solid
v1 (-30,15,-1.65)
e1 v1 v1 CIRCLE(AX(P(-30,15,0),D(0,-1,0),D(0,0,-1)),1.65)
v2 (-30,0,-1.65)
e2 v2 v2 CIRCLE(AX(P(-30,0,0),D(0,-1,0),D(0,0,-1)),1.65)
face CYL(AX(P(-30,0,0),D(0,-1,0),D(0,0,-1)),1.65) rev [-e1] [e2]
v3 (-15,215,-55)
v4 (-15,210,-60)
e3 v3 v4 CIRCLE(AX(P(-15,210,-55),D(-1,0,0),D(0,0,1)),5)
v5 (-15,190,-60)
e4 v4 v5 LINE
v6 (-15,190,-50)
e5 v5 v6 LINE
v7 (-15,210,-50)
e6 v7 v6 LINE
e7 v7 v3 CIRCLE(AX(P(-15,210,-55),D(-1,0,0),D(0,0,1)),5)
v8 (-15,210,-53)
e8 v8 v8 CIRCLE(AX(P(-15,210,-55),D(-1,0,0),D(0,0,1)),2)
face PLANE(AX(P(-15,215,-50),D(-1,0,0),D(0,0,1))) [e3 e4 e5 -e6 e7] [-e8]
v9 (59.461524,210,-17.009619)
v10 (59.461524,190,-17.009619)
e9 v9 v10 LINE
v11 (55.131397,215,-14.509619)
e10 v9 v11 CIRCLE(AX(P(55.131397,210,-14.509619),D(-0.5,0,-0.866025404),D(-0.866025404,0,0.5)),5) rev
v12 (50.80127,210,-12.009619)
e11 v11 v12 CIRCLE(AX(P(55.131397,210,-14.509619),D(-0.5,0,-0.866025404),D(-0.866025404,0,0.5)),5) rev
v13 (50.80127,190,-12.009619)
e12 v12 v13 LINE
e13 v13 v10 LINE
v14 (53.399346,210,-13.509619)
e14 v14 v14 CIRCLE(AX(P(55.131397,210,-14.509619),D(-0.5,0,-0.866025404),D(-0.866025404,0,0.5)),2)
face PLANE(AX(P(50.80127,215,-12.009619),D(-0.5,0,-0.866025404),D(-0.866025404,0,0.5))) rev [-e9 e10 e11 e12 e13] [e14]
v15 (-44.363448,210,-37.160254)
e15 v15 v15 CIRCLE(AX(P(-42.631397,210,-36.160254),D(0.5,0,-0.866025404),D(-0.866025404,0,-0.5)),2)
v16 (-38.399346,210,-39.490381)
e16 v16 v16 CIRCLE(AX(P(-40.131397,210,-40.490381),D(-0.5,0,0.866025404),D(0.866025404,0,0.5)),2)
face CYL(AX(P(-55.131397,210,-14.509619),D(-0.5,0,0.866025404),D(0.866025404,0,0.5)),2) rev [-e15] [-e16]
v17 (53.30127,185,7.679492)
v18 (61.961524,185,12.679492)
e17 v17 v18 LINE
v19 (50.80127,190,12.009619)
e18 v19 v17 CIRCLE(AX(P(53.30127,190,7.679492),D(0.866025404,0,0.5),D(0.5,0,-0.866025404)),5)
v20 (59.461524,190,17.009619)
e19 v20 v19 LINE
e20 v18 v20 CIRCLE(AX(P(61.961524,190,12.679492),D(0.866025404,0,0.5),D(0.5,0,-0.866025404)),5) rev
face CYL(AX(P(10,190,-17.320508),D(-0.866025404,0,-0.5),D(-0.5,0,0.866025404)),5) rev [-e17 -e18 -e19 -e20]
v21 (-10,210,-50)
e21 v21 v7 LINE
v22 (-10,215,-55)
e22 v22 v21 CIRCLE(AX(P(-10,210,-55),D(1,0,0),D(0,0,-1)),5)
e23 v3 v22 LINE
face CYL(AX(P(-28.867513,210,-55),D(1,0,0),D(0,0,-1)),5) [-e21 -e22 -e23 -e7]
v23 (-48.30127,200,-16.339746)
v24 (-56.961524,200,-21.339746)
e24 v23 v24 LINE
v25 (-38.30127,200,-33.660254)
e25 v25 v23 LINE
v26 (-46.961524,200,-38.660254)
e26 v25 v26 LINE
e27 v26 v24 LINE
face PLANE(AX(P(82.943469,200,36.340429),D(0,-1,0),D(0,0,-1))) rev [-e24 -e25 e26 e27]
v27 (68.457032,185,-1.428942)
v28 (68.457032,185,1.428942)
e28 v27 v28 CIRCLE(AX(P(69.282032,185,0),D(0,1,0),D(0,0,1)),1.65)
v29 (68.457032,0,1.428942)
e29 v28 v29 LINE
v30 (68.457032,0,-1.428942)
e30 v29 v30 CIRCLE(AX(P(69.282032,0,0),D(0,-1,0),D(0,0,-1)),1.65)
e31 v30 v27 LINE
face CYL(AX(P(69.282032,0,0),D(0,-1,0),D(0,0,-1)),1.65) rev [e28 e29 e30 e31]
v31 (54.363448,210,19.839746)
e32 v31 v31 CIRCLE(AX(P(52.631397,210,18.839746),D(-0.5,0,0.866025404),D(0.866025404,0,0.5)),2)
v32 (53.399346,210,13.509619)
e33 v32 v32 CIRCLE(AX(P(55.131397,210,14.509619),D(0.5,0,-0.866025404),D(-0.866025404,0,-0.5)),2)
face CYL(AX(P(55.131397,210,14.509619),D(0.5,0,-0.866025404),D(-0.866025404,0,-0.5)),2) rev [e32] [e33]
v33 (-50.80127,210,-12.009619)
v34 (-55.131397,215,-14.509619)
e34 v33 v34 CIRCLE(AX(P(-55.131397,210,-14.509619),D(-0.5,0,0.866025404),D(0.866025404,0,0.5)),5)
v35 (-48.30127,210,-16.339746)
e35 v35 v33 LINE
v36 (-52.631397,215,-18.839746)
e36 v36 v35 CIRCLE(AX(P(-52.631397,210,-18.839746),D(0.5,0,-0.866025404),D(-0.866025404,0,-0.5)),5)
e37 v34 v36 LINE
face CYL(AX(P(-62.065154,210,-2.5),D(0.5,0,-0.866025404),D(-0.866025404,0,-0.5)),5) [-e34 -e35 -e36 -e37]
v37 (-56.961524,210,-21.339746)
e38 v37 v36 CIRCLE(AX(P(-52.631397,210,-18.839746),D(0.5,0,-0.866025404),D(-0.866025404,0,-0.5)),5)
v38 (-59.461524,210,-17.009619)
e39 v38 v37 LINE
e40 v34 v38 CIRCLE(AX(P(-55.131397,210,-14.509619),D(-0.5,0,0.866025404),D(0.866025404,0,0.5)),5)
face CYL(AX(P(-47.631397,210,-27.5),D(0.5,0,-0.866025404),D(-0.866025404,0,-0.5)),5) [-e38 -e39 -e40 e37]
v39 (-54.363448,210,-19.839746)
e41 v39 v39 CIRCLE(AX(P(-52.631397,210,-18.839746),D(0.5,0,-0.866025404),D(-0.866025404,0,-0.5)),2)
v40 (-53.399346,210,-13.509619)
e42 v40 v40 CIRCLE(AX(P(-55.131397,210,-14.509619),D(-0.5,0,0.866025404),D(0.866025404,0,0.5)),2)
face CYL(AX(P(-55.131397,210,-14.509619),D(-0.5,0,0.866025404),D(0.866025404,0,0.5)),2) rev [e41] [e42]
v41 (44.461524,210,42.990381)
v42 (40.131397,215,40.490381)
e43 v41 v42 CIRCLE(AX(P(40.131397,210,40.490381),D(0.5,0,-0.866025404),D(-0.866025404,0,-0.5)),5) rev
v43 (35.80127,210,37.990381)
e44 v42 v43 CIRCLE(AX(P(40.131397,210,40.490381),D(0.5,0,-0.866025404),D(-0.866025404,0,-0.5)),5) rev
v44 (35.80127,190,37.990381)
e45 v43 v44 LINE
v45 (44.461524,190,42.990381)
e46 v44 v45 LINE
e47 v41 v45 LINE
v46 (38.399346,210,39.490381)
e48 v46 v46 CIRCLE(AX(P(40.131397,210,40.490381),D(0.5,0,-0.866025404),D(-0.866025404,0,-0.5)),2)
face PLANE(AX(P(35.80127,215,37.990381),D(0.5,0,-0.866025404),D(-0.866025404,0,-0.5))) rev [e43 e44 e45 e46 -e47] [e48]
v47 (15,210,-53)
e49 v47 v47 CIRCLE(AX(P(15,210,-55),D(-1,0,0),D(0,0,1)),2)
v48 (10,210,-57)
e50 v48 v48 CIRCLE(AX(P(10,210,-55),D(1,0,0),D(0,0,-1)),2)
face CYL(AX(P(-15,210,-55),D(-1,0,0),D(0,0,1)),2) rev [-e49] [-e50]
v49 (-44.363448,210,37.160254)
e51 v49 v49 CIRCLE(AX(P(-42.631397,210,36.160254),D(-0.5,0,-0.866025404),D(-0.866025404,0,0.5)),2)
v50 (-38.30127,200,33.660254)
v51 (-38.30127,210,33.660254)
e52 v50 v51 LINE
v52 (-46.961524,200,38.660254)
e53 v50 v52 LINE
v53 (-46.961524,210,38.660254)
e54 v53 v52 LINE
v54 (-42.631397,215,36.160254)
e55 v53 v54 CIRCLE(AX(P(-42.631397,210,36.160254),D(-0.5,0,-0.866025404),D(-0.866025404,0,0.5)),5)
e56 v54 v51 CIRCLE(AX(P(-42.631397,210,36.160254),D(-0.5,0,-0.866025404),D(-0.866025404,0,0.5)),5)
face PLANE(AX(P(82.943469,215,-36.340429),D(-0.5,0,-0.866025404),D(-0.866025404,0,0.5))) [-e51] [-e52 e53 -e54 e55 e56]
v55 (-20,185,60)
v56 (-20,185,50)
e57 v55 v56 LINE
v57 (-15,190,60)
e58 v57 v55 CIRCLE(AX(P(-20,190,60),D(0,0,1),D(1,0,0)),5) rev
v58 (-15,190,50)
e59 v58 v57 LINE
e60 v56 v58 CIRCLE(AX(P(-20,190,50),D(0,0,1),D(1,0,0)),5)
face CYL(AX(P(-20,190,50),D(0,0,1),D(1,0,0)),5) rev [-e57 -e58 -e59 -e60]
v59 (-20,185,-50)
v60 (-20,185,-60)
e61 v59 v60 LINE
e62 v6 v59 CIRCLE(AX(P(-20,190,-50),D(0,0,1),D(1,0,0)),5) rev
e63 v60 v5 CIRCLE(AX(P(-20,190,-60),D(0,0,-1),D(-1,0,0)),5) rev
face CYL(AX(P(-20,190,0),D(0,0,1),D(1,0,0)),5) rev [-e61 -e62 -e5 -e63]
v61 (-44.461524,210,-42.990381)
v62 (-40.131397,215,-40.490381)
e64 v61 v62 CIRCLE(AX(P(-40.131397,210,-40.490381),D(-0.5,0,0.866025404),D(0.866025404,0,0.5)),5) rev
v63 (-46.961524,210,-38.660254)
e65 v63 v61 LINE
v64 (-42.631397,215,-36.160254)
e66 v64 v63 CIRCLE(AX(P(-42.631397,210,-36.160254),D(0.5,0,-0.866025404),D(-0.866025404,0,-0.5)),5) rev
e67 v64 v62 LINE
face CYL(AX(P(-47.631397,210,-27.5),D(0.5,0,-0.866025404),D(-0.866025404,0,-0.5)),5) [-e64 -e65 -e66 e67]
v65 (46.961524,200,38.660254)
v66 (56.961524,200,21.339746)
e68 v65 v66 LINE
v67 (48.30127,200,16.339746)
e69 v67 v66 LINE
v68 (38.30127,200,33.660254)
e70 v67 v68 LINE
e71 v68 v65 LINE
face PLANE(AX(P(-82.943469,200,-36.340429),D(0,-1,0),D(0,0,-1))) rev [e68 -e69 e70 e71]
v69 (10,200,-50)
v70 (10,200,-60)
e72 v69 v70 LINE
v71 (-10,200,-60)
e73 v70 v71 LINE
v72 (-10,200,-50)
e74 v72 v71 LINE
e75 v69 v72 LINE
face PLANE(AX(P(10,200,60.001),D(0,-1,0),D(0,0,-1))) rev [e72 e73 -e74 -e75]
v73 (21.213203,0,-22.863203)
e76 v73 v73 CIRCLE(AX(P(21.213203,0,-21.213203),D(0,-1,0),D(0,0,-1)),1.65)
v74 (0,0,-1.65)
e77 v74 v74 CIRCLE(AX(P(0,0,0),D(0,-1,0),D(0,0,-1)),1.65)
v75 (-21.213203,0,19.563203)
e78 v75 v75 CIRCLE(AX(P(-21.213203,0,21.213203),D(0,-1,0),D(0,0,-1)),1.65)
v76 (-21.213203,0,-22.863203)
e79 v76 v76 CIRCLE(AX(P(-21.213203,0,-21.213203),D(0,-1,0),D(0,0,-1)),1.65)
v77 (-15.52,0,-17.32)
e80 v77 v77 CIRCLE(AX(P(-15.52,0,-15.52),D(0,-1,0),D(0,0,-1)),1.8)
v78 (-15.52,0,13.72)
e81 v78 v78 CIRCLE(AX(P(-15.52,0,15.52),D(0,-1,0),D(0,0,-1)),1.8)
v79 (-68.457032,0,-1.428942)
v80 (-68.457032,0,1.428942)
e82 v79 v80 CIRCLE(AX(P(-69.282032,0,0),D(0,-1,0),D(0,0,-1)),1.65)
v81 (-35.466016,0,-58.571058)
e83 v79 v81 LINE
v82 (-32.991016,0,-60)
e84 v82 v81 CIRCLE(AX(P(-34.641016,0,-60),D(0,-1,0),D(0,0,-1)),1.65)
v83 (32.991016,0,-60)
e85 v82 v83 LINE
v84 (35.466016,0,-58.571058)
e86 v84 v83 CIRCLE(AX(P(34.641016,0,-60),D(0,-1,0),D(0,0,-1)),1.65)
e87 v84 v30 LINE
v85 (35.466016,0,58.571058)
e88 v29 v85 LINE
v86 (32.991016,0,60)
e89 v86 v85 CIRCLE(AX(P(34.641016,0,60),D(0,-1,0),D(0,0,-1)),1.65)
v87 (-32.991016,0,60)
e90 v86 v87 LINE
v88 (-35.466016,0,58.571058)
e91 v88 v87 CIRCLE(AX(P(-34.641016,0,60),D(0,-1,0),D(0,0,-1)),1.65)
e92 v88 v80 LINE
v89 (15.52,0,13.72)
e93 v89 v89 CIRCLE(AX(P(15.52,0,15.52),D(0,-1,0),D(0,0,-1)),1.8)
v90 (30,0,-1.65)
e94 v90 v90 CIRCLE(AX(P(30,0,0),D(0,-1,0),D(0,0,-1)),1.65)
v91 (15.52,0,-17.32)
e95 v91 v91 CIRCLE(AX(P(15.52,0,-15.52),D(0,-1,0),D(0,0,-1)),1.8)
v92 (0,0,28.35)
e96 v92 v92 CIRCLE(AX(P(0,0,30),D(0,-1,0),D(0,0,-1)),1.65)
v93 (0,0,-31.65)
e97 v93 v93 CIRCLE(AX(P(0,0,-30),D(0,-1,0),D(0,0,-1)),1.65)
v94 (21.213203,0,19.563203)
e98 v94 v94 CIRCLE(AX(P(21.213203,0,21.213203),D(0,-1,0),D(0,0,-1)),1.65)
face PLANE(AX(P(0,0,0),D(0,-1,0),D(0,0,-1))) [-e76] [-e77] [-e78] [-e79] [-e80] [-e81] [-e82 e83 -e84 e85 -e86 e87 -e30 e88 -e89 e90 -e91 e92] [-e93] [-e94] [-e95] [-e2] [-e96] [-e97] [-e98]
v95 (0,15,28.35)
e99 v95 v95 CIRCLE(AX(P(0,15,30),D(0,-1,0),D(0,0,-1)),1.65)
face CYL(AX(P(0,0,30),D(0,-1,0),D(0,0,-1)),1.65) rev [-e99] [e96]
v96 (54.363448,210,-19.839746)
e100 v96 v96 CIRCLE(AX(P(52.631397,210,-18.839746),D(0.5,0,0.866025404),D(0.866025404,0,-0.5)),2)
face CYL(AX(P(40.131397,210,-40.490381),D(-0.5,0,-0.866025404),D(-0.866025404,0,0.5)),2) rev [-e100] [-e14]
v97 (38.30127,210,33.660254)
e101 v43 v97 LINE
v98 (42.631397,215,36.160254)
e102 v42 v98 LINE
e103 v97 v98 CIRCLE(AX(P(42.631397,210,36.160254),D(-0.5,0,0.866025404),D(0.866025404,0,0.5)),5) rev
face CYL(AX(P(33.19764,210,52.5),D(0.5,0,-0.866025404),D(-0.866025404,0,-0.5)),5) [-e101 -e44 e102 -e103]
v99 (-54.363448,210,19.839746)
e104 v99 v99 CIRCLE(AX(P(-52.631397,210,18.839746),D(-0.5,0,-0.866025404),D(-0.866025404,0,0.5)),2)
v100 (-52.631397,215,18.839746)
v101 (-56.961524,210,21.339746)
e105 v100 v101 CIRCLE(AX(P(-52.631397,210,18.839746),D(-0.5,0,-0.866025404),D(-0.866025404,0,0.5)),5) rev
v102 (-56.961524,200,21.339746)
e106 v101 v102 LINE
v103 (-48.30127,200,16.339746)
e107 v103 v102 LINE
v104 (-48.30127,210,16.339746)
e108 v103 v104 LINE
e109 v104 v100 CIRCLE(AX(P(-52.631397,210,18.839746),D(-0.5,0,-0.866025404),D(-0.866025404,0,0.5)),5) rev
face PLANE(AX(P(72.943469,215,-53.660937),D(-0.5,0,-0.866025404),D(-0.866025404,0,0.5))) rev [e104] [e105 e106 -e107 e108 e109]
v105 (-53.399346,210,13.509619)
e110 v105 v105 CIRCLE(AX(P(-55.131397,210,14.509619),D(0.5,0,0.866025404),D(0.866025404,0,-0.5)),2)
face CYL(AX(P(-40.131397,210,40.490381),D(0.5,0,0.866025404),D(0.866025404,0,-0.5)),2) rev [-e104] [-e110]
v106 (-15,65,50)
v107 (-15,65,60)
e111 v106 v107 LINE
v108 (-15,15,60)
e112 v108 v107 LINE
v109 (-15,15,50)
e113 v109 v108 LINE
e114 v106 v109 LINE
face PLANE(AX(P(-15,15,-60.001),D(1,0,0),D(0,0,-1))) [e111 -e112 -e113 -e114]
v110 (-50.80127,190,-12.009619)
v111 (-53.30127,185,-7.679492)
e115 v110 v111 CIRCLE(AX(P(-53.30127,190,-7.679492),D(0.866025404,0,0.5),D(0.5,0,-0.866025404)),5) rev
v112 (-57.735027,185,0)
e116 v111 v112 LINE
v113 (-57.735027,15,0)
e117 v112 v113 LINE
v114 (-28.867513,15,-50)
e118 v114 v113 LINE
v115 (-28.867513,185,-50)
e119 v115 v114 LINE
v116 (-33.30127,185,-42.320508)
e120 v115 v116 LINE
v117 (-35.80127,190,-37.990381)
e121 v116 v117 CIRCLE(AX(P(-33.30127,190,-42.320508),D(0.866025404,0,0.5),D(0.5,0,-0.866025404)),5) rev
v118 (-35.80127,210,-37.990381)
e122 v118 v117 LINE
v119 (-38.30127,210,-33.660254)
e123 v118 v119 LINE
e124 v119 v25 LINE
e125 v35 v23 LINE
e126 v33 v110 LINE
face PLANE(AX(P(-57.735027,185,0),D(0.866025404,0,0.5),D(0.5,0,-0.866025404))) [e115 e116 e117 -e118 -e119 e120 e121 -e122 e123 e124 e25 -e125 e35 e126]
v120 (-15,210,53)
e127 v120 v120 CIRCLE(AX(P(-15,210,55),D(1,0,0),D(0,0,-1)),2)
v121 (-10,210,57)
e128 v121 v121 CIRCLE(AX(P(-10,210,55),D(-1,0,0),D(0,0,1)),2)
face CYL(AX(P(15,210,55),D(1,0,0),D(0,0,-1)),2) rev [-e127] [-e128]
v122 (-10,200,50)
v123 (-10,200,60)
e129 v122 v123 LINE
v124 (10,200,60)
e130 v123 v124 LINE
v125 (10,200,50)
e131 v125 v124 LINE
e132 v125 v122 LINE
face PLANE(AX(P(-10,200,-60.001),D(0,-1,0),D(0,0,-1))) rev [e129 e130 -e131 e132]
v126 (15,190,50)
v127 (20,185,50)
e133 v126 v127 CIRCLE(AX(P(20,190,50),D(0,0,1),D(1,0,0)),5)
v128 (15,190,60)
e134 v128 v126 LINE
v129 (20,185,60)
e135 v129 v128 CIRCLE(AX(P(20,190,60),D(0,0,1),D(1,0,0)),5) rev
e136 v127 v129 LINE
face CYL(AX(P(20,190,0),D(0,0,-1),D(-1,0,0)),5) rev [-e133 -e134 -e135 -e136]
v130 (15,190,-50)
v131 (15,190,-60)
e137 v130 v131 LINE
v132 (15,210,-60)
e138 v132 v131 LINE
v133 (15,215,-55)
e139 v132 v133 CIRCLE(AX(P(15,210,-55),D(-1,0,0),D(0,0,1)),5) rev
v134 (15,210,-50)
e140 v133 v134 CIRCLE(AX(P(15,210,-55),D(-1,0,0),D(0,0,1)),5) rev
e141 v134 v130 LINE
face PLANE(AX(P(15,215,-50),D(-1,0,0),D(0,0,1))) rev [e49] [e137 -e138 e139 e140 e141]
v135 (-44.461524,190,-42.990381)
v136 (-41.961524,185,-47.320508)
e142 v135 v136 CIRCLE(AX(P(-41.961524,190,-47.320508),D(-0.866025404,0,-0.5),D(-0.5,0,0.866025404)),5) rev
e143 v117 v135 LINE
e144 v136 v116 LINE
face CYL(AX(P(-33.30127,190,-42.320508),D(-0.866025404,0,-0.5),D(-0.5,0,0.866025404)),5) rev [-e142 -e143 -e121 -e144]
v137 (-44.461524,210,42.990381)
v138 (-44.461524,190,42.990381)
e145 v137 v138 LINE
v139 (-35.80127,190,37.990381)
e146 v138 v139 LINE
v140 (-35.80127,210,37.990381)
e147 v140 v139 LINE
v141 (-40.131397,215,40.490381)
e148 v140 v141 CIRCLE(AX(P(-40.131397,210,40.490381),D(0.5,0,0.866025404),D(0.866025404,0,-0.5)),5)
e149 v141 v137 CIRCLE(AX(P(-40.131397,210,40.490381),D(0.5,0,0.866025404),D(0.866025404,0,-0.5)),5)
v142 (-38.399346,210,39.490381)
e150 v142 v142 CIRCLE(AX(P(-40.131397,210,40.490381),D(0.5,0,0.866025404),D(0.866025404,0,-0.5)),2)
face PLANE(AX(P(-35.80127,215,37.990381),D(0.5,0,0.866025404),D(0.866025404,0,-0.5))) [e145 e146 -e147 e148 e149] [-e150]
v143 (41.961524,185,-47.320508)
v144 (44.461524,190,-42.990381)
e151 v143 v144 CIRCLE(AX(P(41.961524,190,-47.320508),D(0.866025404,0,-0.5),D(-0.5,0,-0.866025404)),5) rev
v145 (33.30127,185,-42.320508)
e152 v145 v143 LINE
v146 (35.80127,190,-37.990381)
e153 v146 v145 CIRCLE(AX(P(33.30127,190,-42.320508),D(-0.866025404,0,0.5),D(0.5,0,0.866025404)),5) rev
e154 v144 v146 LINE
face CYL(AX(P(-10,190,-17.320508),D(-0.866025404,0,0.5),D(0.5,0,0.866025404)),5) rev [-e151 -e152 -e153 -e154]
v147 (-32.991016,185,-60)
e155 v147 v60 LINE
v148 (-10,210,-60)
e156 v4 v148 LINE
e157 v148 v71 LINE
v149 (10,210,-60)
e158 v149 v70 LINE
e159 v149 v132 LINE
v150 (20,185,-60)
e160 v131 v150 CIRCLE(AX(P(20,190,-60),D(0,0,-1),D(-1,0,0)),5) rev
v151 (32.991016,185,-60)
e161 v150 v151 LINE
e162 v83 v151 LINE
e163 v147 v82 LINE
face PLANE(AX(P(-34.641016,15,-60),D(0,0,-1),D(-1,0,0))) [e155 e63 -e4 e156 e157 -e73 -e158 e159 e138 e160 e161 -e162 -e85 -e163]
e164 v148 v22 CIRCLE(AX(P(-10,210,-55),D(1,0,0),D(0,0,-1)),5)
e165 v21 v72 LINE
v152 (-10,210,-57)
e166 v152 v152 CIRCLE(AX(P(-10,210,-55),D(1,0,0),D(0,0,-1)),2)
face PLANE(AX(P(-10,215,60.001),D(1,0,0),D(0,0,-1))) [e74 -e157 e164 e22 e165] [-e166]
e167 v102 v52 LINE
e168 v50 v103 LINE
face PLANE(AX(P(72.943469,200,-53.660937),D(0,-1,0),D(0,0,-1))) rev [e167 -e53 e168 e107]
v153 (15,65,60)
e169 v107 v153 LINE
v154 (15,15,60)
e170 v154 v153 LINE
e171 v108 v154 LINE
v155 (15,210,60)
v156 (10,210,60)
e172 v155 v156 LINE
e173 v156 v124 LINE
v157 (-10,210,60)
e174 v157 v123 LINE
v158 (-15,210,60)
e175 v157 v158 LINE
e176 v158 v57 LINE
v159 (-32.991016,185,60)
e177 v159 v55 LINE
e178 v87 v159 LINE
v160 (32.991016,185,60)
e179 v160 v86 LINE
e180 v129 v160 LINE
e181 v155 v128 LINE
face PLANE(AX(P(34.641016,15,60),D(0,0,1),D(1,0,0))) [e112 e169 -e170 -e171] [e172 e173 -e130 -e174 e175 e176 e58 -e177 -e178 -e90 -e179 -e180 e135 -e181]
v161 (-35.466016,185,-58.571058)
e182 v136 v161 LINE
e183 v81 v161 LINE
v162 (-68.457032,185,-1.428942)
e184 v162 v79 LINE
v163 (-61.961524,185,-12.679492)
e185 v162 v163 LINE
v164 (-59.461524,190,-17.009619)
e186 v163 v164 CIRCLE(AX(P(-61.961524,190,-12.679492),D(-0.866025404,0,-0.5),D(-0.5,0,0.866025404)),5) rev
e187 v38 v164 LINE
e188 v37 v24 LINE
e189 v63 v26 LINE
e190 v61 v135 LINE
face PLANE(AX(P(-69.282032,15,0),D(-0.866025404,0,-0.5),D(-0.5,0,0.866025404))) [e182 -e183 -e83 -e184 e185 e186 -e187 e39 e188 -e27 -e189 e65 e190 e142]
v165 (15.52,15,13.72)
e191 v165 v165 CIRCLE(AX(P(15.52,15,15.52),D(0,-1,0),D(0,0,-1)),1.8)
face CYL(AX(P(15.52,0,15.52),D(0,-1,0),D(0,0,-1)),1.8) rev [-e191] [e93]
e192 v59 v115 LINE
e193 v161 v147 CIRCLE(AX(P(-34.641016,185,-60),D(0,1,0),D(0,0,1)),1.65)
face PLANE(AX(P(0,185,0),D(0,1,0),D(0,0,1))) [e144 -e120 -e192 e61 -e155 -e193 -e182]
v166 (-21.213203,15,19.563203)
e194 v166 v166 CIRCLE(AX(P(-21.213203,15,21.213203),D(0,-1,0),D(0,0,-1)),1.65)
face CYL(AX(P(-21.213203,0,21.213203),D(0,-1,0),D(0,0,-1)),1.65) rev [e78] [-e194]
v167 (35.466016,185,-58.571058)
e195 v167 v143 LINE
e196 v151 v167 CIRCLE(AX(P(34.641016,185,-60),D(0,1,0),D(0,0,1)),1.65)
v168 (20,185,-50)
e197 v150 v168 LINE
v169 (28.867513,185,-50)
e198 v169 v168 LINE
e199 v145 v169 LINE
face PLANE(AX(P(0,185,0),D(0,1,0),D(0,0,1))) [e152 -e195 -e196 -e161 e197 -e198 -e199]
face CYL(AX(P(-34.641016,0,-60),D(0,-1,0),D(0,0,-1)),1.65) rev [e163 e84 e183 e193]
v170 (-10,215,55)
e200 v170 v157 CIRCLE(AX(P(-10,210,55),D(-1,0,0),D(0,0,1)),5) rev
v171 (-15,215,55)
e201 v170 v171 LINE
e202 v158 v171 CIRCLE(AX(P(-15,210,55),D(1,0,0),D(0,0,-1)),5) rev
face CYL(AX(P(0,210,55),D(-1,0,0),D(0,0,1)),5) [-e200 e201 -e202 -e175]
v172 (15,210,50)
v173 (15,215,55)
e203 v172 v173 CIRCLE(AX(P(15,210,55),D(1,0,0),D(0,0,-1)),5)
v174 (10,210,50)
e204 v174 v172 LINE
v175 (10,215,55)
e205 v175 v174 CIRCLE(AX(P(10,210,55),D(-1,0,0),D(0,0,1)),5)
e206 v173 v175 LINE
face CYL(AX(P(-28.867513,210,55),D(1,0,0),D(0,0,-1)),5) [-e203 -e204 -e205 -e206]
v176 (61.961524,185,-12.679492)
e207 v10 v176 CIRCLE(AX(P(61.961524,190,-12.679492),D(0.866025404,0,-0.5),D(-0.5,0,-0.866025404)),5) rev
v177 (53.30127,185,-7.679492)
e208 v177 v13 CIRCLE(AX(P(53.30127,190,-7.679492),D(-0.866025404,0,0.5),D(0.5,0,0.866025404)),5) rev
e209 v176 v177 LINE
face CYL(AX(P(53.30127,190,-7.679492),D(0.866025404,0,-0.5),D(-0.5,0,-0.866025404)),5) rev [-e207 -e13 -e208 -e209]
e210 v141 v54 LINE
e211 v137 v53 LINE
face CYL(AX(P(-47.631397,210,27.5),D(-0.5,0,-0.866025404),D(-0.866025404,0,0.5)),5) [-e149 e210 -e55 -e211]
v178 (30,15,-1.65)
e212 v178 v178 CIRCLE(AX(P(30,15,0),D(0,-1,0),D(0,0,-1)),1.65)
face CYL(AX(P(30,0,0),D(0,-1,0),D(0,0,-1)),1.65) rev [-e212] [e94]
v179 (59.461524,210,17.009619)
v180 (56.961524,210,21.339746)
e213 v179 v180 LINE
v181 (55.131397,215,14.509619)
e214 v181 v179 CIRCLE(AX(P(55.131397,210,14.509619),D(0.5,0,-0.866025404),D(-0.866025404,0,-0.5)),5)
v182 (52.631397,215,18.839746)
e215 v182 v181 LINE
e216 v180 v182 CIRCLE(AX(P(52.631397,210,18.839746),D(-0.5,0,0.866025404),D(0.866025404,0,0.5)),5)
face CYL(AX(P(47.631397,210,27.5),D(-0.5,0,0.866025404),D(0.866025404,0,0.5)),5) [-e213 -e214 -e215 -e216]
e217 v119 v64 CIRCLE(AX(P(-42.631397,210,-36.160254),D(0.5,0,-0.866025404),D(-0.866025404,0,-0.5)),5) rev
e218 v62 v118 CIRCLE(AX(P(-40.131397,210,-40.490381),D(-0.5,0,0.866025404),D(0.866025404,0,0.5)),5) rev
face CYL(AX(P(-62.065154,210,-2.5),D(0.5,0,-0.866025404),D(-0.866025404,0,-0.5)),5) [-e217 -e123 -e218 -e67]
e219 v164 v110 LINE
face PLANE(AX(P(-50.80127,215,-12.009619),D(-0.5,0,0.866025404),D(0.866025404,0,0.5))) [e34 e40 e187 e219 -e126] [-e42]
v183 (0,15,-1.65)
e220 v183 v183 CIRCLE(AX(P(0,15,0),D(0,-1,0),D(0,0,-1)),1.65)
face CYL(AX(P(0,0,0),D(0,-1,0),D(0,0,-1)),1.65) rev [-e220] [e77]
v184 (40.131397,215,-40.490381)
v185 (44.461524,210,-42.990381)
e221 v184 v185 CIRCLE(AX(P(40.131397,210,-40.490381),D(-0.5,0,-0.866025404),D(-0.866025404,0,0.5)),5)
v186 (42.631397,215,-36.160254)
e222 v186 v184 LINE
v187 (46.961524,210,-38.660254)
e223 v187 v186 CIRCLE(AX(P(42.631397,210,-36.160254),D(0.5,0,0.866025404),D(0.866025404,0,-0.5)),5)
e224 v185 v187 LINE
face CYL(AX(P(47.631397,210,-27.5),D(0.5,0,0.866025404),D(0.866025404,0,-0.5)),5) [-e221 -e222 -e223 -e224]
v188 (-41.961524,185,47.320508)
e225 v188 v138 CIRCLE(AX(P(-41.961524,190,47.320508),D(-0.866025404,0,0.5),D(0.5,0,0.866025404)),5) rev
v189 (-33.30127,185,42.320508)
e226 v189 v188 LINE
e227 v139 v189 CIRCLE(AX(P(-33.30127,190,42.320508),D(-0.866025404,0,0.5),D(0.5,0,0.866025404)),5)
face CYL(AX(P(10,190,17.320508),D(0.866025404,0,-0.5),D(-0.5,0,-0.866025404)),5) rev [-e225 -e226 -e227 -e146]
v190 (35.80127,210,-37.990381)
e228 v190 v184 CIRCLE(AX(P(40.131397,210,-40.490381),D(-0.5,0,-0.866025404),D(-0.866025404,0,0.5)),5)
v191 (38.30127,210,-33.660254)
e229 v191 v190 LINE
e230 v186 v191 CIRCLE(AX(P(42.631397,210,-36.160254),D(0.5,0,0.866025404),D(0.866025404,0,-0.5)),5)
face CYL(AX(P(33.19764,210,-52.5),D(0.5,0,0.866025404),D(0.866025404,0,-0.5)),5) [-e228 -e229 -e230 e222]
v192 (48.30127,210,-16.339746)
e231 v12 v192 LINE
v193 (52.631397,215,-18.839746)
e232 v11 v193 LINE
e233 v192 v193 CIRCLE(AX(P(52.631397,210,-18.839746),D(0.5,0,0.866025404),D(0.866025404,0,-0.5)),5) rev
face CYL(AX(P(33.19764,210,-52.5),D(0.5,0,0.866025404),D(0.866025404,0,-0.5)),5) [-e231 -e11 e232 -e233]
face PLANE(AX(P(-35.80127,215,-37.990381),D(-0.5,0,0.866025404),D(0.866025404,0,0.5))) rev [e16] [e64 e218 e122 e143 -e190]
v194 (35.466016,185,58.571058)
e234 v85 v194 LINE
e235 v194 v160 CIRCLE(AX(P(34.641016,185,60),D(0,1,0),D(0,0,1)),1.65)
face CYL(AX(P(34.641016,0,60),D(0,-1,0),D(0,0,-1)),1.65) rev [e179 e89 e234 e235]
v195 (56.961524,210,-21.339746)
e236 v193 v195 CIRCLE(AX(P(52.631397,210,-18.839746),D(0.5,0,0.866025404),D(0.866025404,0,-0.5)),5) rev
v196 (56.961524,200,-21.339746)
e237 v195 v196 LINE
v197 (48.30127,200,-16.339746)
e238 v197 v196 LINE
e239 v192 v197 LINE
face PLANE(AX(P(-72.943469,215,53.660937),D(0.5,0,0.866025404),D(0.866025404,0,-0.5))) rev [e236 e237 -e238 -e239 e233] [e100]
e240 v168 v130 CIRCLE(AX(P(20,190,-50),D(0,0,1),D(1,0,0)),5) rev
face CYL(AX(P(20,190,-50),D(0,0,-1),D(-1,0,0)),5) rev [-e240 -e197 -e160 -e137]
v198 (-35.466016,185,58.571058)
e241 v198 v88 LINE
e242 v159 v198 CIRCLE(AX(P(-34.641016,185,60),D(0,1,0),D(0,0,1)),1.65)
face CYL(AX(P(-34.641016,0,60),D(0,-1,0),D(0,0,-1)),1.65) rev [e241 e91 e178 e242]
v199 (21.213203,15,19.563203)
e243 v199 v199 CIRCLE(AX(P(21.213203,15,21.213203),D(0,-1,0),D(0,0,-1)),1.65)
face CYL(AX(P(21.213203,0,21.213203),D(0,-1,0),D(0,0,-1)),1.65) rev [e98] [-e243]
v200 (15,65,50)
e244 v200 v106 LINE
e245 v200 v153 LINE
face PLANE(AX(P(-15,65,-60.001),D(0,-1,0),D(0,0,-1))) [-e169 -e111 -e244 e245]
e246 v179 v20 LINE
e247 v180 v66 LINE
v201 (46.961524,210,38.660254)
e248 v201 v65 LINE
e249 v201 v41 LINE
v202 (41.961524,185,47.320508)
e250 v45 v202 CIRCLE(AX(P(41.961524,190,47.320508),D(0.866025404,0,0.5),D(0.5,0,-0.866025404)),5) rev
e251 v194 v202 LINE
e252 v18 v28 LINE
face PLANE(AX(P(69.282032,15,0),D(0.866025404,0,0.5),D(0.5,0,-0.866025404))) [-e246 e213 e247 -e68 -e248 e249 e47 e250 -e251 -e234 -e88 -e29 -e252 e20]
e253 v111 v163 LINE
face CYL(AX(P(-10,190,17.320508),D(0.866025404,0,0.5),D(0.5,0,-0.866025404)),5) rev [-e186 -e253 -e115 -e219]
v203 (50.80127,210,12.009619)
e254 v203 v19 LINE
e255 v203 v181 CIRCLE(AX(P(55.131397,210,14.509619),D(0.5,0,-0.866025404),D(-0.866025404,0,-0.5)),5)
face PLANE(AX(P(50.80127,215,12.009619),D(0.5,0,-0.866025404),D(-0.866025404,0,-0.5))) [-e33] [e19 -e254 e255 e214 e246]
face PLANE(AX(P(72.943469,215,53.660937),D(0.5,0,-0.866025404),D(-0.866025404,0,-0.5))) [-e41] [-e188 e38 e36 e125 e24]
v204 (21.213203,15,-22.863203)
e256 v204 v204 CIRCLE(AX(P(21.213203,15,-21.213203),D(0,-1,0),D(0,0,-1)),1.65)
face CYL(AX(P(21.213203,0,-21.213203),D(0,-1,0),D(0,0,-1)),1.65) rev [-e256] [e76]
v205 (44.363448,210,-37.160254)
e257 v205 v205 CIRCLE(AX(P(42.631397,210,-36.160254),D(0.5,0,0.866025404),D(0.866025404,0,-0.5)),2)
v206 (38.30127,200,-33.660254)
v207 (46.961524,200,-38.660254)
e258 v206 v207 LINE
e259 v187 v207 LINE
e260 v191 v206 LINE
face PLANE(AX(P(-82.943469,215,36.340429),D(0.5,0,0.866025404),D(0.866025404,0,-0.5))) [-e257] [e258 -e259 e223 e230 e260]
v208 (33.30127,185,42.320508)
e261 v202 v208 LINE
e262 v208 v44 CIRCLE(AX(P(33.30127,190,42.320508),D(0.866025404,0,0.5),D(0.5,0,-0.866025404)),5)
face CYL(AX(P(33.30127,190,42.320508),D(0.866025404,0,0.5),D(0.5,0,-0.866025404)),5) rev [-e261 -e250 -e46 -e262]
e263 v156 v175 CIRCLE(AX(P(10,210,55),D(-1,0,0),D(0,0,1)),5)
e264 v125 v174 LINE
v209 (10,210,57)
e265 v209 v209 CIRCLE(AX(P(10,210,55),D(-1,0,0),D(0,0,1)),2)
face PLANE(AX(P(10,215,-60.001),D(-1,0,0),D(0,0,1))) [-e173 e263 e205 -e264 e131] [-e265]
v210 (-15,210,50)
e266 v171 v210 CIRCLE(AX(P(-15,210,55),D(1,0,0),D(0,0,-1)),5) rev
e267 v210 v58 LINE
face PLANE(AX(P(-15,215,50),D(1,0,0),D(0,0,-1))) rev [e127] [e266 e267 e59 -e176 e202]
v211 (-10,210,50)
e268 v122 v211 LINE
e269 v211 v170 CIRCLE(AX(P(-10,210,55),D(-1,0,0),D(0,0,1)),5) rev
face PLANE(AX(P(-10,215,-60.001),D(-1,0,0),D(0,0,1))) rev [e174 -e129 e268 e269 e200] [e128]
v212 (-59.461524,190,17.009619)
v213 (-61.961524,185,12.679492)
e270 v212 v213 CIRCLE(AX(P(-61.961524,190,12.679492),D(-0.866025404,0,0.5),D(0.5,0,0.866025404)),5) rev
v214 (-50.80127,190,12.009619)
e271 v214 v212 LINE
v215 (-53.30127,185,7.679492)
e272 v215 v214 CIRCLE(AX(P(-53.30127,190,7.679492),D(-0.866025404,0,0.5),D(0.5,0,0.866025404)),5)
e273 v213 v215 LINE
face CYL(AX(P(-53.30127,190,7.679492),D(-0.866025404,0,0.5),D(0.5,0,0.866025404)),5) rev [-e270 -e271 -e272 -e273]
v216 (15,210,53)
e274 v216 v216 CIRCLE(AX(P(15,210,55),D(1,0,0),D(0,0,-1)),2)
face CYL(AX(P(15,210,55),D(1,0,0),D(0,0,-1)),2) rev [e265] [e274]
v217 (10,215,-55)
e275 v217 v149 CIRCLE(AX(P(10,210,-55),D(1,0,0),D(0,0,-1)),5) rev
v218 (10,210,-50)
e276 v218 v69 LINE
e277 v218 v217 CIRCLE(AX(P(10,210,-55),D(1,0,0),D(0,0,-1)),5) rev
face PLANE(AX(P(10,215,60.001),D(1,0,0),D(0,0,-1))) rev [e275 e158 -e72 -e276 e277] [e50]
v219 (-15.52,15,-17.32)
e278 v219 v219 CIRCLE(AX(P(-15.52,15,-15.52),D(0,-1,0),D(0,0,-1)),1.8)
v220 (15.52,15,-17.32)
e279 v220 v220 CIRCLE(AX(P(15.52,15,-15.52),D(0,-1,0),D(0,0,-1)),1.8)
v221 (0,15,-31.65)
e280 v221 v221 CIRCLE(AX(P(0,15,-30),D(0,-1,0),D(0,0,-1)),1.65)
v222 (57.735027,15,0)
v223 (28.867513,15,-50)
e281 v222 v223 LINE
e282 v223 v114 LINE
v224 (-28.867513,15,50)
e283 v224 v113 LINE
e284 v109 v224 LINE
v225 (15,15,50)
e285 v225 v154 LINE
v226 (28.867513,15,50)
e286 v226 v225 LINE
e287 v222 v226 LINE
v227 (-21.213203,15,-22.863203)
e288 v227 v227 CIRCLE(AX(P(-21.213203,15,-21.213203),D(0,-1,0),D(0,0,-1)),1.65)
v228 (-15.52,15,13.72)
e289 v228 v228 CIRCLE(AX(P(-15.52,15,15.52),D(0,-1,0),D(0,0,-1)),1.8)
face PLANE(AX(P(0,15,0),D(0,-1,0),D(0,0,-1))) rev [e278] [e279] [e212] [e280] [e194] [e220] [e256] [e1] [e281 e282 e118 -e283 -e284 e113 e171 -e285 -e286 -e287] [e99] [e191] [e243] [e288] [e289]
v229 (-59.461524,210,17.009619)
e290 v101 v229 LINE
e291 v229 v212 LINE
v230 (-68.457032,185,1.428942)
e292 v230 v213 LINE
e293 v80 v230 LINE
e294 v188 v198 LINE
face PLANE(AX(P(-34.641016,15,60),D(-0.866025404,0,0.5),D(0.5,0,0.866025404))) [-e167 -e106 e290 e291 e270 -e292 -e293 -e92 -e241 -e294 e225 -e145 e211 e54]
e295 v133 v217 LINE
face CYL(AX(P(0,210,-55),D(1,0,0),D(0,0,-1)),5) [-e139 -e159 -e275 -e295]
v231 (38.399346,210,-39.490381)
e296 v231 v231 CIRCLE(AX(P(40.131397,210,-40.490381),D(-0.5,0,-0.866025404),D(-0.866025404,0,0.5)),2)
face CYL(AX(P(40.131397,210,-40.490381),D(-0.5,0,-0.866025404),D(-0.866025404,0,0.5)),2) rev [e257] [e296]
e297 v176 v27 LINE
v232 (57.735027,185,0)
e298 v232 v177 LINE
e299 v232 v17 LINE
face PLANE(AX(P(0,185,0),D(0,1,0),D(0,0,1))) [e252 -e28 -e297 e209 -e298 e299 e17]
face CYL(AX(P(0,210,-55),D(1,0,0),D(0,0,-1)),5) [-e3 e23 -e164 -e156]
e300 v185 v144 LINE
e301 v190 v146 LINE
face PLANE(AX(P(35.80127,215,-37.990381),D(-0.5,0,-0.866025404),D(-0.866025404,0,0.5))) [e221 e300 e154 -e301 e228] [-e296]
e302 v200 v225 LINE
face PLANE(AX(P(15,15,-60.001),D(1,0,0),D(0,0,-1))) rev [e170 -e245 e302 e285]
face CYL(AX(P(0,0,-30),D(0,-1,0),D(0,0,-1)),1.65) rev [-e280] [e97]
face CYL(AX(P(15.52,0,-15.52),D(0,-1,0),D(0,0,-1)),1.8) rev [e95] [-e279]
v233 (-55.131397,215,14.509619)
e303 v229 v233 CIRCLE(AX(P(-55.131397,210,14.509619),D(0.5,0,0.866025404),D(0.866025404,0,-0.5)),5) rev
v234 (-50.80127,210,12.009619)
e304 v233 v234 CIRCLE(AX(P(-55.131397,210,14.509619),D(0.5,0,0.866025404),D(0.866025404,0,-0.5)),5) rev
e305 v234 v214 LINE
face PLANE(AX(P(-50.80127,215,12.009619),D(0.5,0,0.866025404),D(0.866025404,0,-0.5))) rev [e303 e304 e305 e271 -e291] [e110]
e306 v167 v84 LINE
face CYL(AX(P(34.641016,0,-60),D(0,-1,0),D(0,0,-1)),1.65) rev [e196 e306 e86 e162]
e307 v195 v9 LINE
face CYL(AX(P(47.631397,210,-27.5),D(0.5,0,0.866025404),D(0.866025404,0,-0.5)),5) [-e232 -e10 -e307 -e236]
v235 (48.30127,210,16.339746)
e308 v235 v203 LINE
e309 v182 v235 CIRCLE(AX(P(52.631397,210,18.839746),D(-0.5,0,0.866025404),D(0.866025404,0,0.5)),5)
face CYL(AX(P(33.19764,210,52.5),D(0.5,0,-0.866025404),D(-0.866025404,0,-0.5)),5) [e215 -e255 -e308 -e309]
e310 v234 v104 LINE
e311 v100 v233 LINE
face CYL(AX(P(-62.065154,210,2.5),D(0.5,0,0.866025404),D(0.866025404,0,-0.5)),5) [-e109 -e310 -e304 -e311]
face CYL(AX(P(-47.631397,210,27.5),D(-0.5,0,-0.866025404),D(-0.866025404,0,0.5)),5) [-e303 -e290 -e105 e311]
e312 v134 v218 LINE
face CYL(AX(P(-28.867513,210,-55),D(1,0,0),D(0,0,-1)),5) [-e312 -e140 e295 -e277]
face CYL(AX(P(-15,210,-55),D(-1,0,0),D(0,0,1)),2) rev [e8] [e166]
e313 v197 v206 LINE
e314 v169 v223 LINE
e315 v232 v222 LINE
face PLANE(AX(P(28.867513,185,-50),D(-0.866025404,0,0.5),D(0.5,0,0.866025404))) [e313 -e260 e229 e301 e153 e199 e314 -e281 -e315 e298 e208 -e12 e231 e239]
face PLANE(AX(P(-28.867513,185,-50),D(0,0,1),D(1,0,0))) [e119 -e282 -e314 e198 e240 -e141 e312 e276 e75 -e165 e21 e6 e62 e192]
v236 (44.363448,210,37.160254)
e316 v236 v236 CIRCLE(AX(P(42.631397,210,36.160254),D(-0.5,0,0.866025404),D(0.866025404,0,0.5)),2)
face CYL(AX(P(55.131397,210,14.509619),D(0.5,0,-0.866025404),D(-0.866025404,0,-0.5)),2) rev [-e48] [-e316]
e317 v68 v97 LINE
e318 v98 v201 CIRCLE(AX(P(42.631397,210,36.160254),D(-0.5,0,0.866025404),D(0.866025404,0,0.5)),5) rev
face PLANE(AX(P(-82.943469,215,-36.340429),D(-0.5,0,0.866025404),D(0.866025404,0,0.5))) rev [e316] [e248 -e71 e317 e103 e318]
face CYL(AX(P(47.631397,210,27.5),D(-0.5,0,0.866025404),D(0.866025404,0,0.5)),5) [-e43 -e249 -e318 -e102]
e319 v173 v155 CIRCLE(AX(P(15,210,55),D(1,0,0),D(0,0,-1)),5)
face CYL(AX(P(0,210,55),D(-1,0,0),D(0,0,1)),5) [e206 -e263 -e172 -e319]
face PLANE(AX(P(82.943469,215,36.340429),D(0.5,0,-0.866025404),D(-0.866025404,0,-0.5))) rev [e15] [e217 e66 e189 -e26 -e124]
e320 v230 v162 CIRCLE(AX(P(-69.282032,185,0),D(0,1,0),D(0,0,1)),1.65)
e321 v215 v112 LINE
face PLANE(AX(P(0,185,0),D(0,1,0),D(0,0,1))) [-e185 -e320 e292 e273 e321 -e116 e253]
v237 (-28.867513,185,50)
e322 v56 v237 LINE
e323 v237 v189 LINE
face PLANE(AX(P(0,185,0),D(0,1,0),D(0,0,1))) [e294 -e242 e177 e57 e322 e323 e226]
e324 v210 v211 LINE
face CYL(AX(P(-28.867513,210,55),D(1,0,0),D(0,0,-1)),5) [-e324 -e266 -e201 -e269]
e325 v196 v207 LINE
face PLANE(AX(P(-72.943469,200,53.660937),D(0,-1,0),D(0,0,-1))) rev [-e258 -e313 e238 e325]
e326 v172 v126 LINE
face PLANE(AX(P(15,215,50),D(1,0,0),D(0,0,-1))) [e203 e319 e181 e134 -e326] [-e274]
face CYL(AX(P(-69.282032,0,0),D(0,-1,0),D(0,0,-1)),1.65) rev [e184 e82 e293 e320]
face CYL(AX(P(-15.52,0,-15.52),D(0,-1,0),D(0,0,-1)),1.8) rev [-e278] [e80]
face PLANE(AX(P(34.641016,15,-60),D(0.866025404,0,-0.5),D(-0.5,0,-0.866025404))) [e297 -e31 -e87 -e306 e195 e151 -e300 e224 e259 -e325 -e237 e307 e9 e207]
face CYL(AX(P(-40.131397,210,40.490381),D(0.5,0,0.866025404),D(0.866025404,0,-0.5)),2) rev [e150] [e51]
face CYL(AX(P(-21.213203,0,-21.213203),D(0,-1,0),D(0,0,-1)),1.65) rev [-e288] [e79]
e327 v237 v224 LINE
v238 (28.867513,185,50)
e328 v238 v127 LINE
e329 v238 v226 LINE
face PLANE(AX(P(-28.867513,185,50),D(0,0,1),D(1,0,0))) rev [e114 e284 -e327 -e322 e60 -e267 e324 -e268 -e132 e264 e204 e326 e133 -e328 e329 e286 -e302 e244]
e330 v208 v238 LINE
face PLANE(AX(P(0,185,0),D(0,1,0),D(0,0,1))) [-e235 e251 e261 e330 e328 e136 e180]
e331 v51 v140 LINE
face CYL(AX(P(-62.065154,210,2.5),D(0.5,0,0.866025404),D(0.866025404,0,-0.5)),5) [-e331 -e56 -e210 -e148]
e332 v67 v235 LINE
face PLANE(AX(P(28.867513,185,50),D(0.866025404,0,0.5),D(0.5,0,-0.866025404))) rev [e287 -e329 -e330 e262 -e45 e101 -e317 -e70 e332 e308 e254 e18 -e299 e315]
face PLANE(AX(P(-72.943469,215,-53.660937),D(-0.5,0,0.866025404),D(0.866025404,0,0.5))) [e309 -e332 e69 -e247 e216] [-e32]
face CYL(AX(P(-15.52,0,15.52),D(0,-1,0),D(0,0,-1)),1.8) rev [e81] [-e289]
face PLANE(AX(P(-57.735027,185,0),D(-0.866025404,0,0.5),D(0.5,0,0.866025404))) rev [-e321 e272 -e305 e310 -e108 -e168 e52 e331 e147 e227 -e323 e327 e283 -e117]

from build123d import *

# Parameters (mm, degrees)
BOSS_EXTRUDE1_DEPTH                 = 15
BOSS_EXTRUDE3_DEPTH                 = 170
SKETCH5_W                           = 30
SKETCH5_H                           = 10
BOSS_EXTRUDE4_DEPTH                 = 30
CIRPATTERN2_COUNT                   = 6
CUT_EXTRUDE1_REACH                  = 264.726
SKETCH7_W                           = 20
SKETCH7_H                           = 15
CIRPATTERN4_COUNT                   = 6
FILLET1_R                           = 5
F_4_0_MM_DOWEL_HOLES1_D             = 4
CIRPATTERN8_COUNT                   = 6
CUT_EXTRUDE2_REACH                  = 257.783
SKETCH11_W                          = 30
SKETCH11_H                          = 50
M3_CLEARANCE_HOLE1_D                = 3.6
LPATTERN1_COUNT                     = 2
LPATTERN1_PITCH                     = 31.04
LPATTERN1_COUNT_DIR2                = 2
LPATTERN1_PITCH_DIR2                = 31.04
TAP_DRILL_FOR_M4X0_7_TAP2_OUTLINE_R = 1.65
TAP_DRILL_FOR_M4X0_7_TAP2_DEPTH     = 185


# Read off the part's stored shape, not the designer's step: Tap Drill for M4x0.7 Tap2
with BuildPart() as part:
    # Sketch1 → Boss-Extrude1 (new body)
    with BuildSketch(Plane(origin=(0, 0, 0), x_dir=(1, 0, 0), z_dir=(0, 1, 0))):
        Polygon((-69.282032303, 0), (-34.641016151, 60), (34.641016151, 60), (69.282032303, 0), (34.641016151, -60), (-34.641016151, -60), align=None)
    extrude(amount=BOSS_EXTRUDE1_DEPTH)

    # Sketch4 → Boss-Extrude3 (add)
    with BuildSketch(Plane(origin=(0, 15, 0), x_dir=(1, 0, 0), z_dir=(0, 1, 0))):
        Polygon((-34.641016151, -60), (34.641016151, -60), (69.282032303, 0), (57.735026919, 0), (28.867513459, -50), (-28.867513459, -50), (-57.735026919, 0), (-69.282032303, 0), align=None)
    boss_extrude3 = extrude(amount=BOSS_EXTRUDE3_DEPTH)

    # Mirror1: Boss-Extrude3 across plane
    add(boss_extrude3.mirror(Plane(origin=(57.735026919, 185, 0), x_dir=(1, 0, 0), z_dir=(0, 0, 1))))

    # Sketch5 → Boss-Extrude4 (add)
    with BuildSketch(Plane(origin=(0, 185, 0), x_dir=(1, 0, 0), z_dir=(0, 1, 0))):
        with Locations((0, -55)):
            Rectangle(SKETCH5_W, SKETCH5_H)
    boss_extrude4 = extrude(amount=BOSS_EXTRUDE4_DEPTH)

    # CirPattern2: Boss-Extrude4 ×6 about axis
    cirpattern2_axis = Axis((0, 0, 0), (0, 1, 0))
    for i in range(1, CIRPATTERN2_COUNT):
        add(boss_extrude4.rotate(cirpattern2_axis, i * 360 / CIRPATTERN2_COUNT))

    # Sketch7 → Cut-Extrude1 (cut, up to next)
    with BuildSketch(Plane(origin=(-51.961524227, 0, 30), x_dir=(0.49999999999999695, 0, 0.8660254037844404), z_dir=(-0.8660254037844404, 0, 0.49999999999999695)), mode=Mode.PRIVATE) as cut_extrude1_sk1:
        with Locations((0, 207.5)):
            Rectangle(SKETCH7_W, SKETCH7_H)
    cut_extrude1_tool1 = extrude(cut_extrude1_sk1.sketch, amount=-CUT_EXTRUDE1_REACH, mode=Mode.PRIVATE) & part.part
    cut_extrude1 = cut_extrude1_tool1.solids().sort_by_distance((-51.961524, 207.5, 30))[0]
    add(cut_extrude1, mode=Mode.SUBTRACT)

    # CirPattern4: Cut-Extrude1 ×6 about axis
    cirpattern4_axis = Axis((0, 0, 0), (0, 1, 0))
    for i in range(1, CIRPATTERN4_COUNT):
        add(cut_extrude1.rotate(cirpattern4_axis, i * 360 / CIRPATTERN4_COUNT), mode=Mode.SUBTRACT)

    # Fillet1
    fillet1_edges = [part.edges().sort_by_distance(p)[0] for p in [
        (-55.131397208, 185, 14.509618943),
        (-40.131397208, 185, 40.490381057),
        (-40.131397208, 185, -40.490381057),
        (-55.131397208, 185, -14.509618943),
        (15, 185, -55),
        (-15, 185, -55),
        (55.131397208, 185, -14.509618943),
        (40.131397208, 185, -40.490381057),
        (40.131397208, 185, 40.490381057),
        (55.131397208, 185, 14.509618943),
        (-15, 185, 55),
        (15, 185, 55),
    ]]
    fillet(fillet1_edges, radius=FILLET1_R)
    fillet1_2_edges = [part.edges().sort_by_distance(p)[0] for p in [
        (-49.551270189, 215, 14.174682453),
        (-58.211524227, 215, 19.174682453),
        (-37.051270189, 215, -35.825317547),
        (-45.711524227, 215, -40.825317547),
        (12.5, 215, -50),
        (12.5, 215, -60),
        (49.551270189, 215, -14.174682453),
        (58.211524227, 215, -19.174682453),
        (37.051270189, 215, 35.825317547),
        (45.711524227, 215, 40.825317547),
        (-37.051270189, 215, 35.825317547),
        (-45.711524227, 215, 40.825317547),
        (49.551270189, 215, 14.174682453),
        (58.211524227, 215, 19.174682453),
        (-49.551270189, 215, -14.174682453),
        (-58.211524227, 215, -19.174682453),
        (-12.5, 215, -50),
        (-12.5, 215, -60),
        (37.051270189, 215, -35.825317547),
        (45.711524227, 215, -40.825317547),
        (12.5, 215, 50),
        (12.5, 215, 60),
        (-12.5, 215, 50),
        (-12.5, 215, 60),
    ]]
    fillet(fillet1_2_edges, radius=FILLET1_R - 0.0001)  # a hair under: the kernel refuses the full size

    # Ø4.0 mm Dowel Holes1 (through all)
    with Locations(Plane(origin=(15, 0, 0), x_dir=(0, 0, -1), z_dir=(1, 0, 0))):
        with Locations((-55, 210)):
            f_4_0_mm_dowel_holes1 = Hole(F_4_0_MM_DOWEL_HOLES1_D / 2)

    # CirPattern8: Ø4.0 mm Dowel Holes1 ×6 about axis
    cirpattern8_axis = Axis((0, 15, 0), (0, -1, 0))
    for i in range(1, CIRPATTERN8_COUNT):
        add(f_4_0_mm_dowel_holes1.rotate(cirpattern8_axis, i * 360 / CIRPATTERN8_COUNT), mode=Mode.SUBTRACT)

    # Sketch11 → Cut-Extrude2 (cut, up to next)
    with BuildSketch(Plane.XY.offset(60), mode=Mode.PRIVATE) as cut_extrude2_sk1:
        with Locations((0, 40)):
            Rectangle(SKETCH11_W, SKETCH11_H)
    cut_extrude2_tool1 = extrude(cut_extrude2_sk1.sketch, amount=-CUT_EXTRUDE2_REACH, mode=Mode.PRIVATE) & part.part
    add(cut_extrude2_tool1.solids().sort_by_distance((0, 40, 60))[0], mode=Mode.SUBTRACT)

    # M3 Clearance Hole1 (through all)
    with Locations(Plane(origin=(0, 0, 0), x_dir=(-1, 0, 0), z_dir=(0, -1, 0))):
        with Locations((-15.52, 15.52)):
            m3_clearance_hole1 = Hole(M3_CLEARANCE_HOLE1_D / 2)

    # LPattern1: M3 Clearance Hole1 2 × 2
    with Locations(*[(-i * LPATTERN1_PITCH, 0, j * LPATTERN1_PITCH_DIR2) for i in range(LPATTERN1_COUNT) for j in range(LPATTERN1_COUNT_DIR2) if (i, j) != (0, 0)]):
        add(m3_clearance_hole1, mode=Mode.SUBTRACT)

    # Tap Drill for M4x0.7 Tap2 outline → Tap Drill for M4x0.7 Tap2 (cut)
    with BuildSketch(Plane(origin=(0, 0, 0), x_dir=(1, 0, 0), z_dir=(0, 1, 0))):
        Circle(TAP_DRILL_FOR_M4X0_7_TAP2_OUTLINE_R)
        with Locations((-21.213203436, -21.213203436)):
            Circle(TAP_DRILL_FOR_M4X0_7_TAP2_OUTLINE_R)
        with Locations((-30, 0)):
            Circle(TAP_DRILL_FOR_M4X0_7_TAP2_OUTLINE_R)
        with Locations((-21.213203436, 21.213203436)):
            Circle(TAP_DRILL_FOR_M4X0_7_TAP2_OUTLINE_R)
        with Locations((0, 30)):
            Circle(TAP_DRILL_FOR_M4X0_7_TAP2_OUTLINE_R)
        with Locations((21.213203436, 21.213203436)):
            Circle(TAP_DRILL_FOR_M4X0_7_TAP2_OUTLINE_R)
        with Locations((30, 0)):
            Circle(TAP_DRILL_FOR_M4X0_7_TAP2_OUTLINE_R)
        with Locations((21.213203436, -21.213203436)):
            Circle(TAP_DRILL_FOR_M4X0_7_TAP2_OUTLINE_R)
        with Locations((0, -30)):
            Circle(TAP_DRILL_FOR_M4X0_7_TAP2_OUTLINE_R)
        with BuildLine():
            ThreePointArc((-32.991016151, -60), (-33.816016151, -58.571058084), (-35.466016151, -58.571058084))
            Line((-35.466016151, -58.571058084), (-34.641016151, -60))
            Line((-34.641016151, -60), (-32.991016151, -60))
        make_face()
        with BuildLine():
            Line((-69.282032303, 0), (-68.457032303, -1.428941916))
            ThreePointArc((-68.457032303, -1.428941916), (-67.632032303, 0), (-68.457032303, 1.428941916))
            Line((-68.457032303, 1.428941916), (-69.282032303, 0))
        make_face()
        with BuildLine():
            ThreePointArc((35.466016151, -58.571058084), (33.816016151, -58.571058084), (32.991016151, -60))
            Line((32.991016151, -60), (34.641016151, -60))
            Line((34.641016151, -60), (35.466016151, -58.571058084))
        make_face()
        with BuildLine():
            Line((-34.641016151, 60), (-35.466016151, 58.571058084))
            ThreePointArc((-35.466016151, 58.571058084), (-33.816016151, 58.571058084), (-32.991016151, 60))
            Line((-32.991016151, 60), (-34.641016151, 60))
        make_face()
        with BuildLine():
            ThreePointArc((68.457032303, 1.428941916), (67.632032303, 0), (68.457032303, -1.428941916))
            Line((68.457032303, -1.428941916), (69.282032303, 0))
            Line((69.282032303, 0), (68.457032303, 1.428941916))
        make_face()
        with BuildLine():
            Line((34.641016151, 60), (32.991016151, 60))
            ThreePointArc((32.991016151, 60), (33.816016151, 58.571058084), (35.466016151, 58.571058084))
            Line((35.466016151, 58.571058084), (34.641016151, 60))
        make_face()
    extrude(amount=TAP_DRILL_FOR_M4X0_7_TAP2_DEPTH, mode=Mode.SUBTRACT)


solid = part.part
